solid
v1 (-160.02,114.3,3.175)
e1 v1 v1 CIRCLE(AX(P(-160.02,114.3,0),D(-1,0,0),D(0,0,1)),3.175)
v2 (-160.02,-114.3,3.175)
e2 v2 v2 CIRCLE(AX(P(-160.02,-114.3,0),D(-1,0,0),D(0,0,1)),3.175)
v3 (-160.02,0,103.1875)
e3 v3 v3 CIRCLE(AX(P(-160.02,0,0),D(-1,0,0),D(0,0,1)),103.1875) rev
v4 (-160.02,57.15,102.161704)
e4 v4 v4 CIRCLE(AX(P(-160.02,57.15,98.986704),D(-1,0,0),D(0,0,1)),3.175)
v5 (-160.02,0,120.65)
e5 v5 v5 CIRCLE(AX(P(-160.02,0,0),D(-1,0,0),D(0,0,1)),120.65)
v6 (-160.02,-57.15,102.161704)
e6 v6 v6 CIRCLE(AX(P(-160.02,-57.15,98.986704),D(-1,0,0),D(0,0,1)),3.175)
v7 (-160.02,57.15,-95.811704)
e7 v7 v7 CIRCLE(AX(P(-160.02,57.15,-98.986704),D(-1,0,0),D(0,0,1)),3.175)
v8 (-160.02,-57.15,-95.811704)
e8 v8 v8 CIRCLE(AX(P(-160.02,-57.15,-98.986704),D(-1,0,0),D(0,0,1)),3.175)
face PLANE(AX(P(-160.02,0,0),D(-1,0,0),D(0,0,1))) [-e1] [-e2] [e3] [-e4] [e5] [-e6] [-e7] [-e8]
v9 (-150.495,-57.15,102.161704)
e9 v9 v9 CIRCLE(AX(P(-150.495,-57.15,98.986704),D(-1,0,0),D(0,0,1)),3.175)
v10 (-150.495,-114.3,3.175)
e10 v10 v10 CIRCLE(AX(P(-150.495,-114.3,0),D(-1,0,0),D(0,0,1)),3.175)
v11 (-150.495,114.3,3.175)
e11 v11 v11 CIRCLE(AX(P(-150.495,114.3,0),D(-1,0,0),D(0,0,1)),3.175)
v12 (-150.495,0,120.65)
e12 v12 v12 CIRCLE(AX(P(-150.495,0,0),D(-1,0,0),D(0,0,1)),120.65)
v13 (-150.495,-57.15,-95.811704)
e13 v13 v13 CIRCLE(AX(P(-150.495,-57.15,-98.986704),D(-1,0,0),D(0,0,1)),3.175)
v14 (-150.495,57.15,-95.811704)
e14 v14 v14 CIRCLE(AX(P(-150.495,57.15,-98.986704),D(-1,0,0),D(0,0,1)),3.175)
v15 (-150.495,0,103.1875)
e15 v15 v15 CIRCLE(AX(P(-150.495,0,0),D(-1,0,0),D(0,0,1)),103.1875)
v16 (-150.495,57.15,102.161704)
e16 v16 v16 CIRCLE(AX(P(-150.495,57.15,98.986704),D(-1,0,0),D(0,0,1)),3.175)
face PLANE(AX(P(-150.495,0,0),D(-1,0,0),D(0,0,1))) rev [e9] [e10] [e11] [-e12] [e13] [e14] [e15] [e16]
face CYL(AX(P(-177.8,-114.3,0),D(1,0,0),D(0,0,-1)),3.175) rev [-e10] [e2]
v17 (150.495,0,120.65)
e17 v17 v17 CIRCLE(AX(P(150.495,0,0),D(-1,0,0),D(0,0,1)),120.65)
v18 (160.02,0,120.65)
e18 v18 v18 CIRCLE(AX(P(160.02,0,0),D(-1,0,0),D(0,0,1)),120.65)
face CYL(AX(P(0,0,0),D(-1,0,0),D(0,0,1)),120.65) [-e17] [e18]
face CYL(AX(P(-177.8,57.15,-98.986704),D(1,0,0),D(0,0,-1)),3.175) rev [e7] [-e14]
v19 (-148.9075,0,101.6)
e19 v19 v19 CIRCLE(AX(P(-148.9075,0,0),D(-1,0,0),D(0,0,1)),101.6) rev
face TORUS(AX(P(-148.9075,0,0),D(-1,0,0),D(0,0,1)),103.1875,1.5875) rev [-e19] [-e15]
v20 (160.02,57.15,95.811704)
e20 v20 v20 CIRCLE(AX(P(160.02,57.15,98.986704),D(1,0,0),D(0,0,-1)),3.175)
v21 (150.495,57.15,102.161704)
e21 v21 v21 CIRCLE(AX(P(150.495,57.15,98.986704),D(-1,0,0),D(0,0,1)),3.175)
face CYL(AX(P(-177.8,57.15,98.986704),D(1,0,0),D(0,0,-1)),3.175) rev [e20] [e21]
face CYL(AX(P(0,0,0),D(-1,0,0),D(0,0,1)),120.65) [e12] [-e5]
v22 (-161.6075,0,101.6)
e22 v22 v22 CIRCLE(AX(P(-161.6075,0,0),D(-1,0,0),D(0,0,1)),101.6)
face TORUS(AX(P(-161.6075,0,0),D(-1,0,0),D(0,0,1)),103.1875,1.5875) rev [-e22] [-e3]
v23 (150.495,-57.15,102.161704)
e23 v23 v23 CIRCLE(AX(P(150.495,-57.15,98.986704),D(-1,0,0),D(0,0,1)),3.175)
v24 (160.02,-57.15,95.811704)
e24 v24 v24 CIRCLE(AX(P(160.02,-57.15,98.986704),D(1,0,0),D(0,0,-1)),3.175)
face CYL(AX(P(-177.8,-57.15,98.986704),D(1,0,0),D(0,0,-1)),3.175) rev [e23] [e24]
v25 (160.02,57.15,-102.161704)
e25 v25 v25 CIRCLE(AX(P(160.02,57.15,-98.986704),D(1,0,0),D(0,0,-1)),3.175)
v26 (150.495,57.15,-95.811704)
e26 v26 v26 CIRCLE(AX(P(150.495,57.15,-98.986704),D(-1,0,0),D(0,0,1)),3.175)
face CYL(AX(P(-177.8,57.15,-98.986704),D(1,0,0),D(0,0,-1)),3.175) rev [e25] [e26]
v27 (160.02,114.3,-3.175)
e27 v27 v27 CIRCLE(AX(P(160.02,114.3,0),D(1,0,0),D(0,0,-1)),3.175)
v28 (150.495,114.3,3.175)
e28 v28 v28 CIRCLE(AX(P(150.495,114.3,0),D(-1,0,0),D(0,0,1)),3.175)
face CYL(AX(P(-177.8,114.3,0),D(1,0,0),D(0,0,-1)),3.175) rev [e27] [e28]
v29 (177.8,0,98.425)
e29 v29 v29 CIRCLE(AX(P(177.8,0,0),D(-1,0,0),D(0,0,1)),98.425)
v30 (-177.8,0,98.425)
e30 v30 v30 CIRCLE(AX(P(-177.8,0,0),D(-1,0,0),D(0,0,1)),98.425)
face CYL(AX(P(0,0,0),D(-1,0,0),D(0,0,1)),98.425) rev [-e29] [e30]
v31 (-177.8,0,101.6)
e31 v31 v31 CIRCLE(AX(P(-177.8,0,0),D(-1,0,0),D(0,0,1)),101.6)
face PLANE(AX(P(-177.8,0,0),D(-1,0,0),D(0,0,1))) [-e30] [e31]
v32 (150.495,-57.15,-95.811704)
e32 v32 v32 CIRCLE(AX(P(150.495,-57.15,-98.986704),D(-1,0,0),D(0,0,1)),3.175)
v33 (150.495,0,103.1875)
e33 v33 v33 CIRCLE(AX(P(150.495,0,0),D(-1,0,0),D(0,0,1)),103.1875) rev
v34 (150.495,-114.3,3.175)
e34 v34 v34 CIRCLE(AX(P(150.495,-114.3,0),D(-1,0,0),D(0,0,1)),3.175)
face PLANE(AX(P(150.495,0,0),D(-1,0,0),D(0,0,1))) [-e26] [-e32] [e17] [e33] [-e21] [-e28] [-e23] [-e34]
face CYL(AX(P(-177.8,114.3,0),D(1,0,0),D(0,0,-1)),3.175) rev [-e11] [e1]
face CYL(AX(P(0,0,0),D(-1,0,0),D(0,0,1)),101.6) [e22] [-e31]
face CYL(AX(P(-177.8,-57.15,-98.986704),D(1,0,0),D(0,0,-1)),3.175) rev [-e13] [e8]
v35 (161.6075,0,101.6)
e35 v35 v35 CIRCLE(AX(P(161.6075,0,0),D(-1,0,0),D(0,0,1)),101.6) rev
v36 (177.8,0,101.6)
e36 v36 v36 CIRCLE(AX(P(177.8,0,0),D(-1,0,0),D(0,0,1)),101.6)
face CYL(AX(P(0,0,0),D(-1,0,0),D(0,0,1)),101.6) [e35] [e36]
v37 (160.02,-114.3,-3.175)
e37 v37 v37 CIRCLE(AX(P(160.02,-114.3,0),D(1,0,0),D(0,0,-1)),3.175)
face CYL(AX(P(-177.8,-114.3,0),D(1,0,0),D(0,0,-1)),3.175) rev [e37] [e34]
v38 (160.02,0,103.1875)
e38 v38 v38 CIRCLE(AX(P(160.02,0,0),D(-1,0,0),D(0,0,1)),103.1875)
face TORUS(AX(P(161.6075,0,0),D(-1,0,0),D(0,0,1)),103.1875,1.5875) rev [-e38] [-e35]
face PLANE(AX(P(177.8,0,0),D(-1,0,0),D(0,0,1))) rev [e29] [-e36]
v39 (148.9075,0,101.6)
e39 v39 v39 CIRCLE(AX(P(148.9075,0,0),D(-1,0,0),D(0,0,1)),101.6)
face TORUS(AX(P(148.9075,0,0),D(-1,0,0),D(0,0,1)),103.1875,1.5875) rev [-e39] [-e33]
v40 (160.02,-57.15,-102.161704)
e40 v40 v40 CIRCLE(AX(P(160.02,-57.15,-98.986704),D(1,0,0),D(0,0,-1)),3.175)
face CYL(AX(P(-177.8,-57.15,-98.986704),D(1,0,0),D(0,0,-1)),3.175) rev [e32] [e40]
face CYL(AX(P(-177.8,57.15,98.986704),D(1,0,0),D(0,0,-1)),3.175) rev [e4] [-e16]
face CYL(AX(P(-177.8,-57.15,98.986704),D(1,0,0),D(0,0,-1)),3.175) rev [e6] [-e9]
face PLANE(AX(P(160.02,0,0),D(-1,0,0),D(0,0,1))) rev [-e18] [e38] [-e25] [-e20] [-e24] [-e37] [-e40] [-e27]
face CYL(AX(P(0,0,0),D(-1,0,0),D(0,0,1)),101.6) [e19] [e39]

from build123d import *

# Parameters (mm, degrees)
SKETCH2_R          = 3.175
CUT_EXTRUDE1_DEPTH = 379.464261721


with BuildPart() as part:
    # Sketch1 → Revolve1 (revolve)
    with BuildSketch(Plane.XY, mode=Mode.PRIVATE) as revolve1_sk:
        Polygon((160.02, -101.6), (177.8, -101.6), (177.8, -98.425), (-177.8, -98.425), (-177.8, -101.6), (-160.02, -101.6), (-160.02, -120.65), (-150.495, -120.65), (-150.495, -101.6), (150.495, -101.6), (150.495, -120.65), (160.02, -120.65), align=None)
        Polygon((177.8, 98.425), (177.8, 101.6), (160.02, 101.6), (160.02, 120.65), (150.495, 120.65), (150.495, 101.6), (-150.495, 101.6), (-150.495, 120.65), (-160.02, 120.65), (-160.02, 101.6), (-177.8, 101.6), (-177.8, 98.425), align=None)
    revolve(revolve1_sk.sketch.rotate(Axis((0, 0, 0), (1, 0, 0)), 270), axis=Axis((0, 0, 0), (1, 0, 0)))

    # Sketch2 → Cut-Extrude1 (cut, through all)
    with BuildSketch(Plane(origin=(160.02, 0, 0), x_dir=(0, 0, -1), z_dir=(1, 0, 0))):
        with Locations(Location((0, 114.3, 0), (0, 0, 180))):
            Circle(SKETCH2_R)
        with Locations(Location((98.986703653, 57.15, 0), (0, 0, 180))):
            Circle(SKETCH2_R)
        with Locations(Location((98.986703653, -57.15, 0), (0, 0, 180))):
            Circle(SKETCH2_R)
        with Locations(Location((0, -114.3, 0), (0, 0, 180))):
            Circle(SKETCH2_R)
        with Locations(Location((-98.986703653, -57.15, 0), (0, 0, 180))):
            Circle(SKETCH2_R)
        with Locations(Location((-98.986703653, 57.15, 0), (0, 0, 180))):
            Circle(SKETCH2_R)
    extrude(amount=-CUT_EXTRUDE1_DEPTH, mode=Mode.SUBTRACT)

    # Solvent Weld: read off the stored shape, not the designer's step
    # Solvent Weld outline → Solvent Weld (revolve)
    with BuildSketch(Plane.YX):
        with BuildLine():
            Line((101.6, 160.02), (103.1875, 160.02))
            ThreePointArc((103.1875, 160.02), (102.064967985, 160.484967985), (101.6, 161.6075))
            Line((101.6, 161.6075), (101.6, 160.02))
        make_face()
        with BuildLine():
            ThreePointArc((101.6, 148.9075), (102.064967985, 150.030032015), (103.1875, 150.495))
            Line((103.1875, 150.495), (101.6, 150.495))
            Line((101.6, 150.495), (101.6, 148.9075))
        make_face()
        with BuildLine():
            ThreePointArc((103.1875, -150.495), (102.064967985, -150.030032015), (101.6, -148.9075))
            Line((101.6, -148.9075), (101.6, -150.495))
            Line((101.6, -150.495), (103.1875, -150.495))
        make_face()
        with BuildLine():
            ThreePointArc((101.6, -161.6075), (102.064967985, -160.484967985), (103.1875, -160.02))
            Line((103.1875, -160.02), (101.6, -160.02))
            Line((101.6, -160.02), (101.6, -161.6075))
        make_face()
    revolve(axis=Axis((0, 0, 0), (1, 0, 0)))


solid = part.part
